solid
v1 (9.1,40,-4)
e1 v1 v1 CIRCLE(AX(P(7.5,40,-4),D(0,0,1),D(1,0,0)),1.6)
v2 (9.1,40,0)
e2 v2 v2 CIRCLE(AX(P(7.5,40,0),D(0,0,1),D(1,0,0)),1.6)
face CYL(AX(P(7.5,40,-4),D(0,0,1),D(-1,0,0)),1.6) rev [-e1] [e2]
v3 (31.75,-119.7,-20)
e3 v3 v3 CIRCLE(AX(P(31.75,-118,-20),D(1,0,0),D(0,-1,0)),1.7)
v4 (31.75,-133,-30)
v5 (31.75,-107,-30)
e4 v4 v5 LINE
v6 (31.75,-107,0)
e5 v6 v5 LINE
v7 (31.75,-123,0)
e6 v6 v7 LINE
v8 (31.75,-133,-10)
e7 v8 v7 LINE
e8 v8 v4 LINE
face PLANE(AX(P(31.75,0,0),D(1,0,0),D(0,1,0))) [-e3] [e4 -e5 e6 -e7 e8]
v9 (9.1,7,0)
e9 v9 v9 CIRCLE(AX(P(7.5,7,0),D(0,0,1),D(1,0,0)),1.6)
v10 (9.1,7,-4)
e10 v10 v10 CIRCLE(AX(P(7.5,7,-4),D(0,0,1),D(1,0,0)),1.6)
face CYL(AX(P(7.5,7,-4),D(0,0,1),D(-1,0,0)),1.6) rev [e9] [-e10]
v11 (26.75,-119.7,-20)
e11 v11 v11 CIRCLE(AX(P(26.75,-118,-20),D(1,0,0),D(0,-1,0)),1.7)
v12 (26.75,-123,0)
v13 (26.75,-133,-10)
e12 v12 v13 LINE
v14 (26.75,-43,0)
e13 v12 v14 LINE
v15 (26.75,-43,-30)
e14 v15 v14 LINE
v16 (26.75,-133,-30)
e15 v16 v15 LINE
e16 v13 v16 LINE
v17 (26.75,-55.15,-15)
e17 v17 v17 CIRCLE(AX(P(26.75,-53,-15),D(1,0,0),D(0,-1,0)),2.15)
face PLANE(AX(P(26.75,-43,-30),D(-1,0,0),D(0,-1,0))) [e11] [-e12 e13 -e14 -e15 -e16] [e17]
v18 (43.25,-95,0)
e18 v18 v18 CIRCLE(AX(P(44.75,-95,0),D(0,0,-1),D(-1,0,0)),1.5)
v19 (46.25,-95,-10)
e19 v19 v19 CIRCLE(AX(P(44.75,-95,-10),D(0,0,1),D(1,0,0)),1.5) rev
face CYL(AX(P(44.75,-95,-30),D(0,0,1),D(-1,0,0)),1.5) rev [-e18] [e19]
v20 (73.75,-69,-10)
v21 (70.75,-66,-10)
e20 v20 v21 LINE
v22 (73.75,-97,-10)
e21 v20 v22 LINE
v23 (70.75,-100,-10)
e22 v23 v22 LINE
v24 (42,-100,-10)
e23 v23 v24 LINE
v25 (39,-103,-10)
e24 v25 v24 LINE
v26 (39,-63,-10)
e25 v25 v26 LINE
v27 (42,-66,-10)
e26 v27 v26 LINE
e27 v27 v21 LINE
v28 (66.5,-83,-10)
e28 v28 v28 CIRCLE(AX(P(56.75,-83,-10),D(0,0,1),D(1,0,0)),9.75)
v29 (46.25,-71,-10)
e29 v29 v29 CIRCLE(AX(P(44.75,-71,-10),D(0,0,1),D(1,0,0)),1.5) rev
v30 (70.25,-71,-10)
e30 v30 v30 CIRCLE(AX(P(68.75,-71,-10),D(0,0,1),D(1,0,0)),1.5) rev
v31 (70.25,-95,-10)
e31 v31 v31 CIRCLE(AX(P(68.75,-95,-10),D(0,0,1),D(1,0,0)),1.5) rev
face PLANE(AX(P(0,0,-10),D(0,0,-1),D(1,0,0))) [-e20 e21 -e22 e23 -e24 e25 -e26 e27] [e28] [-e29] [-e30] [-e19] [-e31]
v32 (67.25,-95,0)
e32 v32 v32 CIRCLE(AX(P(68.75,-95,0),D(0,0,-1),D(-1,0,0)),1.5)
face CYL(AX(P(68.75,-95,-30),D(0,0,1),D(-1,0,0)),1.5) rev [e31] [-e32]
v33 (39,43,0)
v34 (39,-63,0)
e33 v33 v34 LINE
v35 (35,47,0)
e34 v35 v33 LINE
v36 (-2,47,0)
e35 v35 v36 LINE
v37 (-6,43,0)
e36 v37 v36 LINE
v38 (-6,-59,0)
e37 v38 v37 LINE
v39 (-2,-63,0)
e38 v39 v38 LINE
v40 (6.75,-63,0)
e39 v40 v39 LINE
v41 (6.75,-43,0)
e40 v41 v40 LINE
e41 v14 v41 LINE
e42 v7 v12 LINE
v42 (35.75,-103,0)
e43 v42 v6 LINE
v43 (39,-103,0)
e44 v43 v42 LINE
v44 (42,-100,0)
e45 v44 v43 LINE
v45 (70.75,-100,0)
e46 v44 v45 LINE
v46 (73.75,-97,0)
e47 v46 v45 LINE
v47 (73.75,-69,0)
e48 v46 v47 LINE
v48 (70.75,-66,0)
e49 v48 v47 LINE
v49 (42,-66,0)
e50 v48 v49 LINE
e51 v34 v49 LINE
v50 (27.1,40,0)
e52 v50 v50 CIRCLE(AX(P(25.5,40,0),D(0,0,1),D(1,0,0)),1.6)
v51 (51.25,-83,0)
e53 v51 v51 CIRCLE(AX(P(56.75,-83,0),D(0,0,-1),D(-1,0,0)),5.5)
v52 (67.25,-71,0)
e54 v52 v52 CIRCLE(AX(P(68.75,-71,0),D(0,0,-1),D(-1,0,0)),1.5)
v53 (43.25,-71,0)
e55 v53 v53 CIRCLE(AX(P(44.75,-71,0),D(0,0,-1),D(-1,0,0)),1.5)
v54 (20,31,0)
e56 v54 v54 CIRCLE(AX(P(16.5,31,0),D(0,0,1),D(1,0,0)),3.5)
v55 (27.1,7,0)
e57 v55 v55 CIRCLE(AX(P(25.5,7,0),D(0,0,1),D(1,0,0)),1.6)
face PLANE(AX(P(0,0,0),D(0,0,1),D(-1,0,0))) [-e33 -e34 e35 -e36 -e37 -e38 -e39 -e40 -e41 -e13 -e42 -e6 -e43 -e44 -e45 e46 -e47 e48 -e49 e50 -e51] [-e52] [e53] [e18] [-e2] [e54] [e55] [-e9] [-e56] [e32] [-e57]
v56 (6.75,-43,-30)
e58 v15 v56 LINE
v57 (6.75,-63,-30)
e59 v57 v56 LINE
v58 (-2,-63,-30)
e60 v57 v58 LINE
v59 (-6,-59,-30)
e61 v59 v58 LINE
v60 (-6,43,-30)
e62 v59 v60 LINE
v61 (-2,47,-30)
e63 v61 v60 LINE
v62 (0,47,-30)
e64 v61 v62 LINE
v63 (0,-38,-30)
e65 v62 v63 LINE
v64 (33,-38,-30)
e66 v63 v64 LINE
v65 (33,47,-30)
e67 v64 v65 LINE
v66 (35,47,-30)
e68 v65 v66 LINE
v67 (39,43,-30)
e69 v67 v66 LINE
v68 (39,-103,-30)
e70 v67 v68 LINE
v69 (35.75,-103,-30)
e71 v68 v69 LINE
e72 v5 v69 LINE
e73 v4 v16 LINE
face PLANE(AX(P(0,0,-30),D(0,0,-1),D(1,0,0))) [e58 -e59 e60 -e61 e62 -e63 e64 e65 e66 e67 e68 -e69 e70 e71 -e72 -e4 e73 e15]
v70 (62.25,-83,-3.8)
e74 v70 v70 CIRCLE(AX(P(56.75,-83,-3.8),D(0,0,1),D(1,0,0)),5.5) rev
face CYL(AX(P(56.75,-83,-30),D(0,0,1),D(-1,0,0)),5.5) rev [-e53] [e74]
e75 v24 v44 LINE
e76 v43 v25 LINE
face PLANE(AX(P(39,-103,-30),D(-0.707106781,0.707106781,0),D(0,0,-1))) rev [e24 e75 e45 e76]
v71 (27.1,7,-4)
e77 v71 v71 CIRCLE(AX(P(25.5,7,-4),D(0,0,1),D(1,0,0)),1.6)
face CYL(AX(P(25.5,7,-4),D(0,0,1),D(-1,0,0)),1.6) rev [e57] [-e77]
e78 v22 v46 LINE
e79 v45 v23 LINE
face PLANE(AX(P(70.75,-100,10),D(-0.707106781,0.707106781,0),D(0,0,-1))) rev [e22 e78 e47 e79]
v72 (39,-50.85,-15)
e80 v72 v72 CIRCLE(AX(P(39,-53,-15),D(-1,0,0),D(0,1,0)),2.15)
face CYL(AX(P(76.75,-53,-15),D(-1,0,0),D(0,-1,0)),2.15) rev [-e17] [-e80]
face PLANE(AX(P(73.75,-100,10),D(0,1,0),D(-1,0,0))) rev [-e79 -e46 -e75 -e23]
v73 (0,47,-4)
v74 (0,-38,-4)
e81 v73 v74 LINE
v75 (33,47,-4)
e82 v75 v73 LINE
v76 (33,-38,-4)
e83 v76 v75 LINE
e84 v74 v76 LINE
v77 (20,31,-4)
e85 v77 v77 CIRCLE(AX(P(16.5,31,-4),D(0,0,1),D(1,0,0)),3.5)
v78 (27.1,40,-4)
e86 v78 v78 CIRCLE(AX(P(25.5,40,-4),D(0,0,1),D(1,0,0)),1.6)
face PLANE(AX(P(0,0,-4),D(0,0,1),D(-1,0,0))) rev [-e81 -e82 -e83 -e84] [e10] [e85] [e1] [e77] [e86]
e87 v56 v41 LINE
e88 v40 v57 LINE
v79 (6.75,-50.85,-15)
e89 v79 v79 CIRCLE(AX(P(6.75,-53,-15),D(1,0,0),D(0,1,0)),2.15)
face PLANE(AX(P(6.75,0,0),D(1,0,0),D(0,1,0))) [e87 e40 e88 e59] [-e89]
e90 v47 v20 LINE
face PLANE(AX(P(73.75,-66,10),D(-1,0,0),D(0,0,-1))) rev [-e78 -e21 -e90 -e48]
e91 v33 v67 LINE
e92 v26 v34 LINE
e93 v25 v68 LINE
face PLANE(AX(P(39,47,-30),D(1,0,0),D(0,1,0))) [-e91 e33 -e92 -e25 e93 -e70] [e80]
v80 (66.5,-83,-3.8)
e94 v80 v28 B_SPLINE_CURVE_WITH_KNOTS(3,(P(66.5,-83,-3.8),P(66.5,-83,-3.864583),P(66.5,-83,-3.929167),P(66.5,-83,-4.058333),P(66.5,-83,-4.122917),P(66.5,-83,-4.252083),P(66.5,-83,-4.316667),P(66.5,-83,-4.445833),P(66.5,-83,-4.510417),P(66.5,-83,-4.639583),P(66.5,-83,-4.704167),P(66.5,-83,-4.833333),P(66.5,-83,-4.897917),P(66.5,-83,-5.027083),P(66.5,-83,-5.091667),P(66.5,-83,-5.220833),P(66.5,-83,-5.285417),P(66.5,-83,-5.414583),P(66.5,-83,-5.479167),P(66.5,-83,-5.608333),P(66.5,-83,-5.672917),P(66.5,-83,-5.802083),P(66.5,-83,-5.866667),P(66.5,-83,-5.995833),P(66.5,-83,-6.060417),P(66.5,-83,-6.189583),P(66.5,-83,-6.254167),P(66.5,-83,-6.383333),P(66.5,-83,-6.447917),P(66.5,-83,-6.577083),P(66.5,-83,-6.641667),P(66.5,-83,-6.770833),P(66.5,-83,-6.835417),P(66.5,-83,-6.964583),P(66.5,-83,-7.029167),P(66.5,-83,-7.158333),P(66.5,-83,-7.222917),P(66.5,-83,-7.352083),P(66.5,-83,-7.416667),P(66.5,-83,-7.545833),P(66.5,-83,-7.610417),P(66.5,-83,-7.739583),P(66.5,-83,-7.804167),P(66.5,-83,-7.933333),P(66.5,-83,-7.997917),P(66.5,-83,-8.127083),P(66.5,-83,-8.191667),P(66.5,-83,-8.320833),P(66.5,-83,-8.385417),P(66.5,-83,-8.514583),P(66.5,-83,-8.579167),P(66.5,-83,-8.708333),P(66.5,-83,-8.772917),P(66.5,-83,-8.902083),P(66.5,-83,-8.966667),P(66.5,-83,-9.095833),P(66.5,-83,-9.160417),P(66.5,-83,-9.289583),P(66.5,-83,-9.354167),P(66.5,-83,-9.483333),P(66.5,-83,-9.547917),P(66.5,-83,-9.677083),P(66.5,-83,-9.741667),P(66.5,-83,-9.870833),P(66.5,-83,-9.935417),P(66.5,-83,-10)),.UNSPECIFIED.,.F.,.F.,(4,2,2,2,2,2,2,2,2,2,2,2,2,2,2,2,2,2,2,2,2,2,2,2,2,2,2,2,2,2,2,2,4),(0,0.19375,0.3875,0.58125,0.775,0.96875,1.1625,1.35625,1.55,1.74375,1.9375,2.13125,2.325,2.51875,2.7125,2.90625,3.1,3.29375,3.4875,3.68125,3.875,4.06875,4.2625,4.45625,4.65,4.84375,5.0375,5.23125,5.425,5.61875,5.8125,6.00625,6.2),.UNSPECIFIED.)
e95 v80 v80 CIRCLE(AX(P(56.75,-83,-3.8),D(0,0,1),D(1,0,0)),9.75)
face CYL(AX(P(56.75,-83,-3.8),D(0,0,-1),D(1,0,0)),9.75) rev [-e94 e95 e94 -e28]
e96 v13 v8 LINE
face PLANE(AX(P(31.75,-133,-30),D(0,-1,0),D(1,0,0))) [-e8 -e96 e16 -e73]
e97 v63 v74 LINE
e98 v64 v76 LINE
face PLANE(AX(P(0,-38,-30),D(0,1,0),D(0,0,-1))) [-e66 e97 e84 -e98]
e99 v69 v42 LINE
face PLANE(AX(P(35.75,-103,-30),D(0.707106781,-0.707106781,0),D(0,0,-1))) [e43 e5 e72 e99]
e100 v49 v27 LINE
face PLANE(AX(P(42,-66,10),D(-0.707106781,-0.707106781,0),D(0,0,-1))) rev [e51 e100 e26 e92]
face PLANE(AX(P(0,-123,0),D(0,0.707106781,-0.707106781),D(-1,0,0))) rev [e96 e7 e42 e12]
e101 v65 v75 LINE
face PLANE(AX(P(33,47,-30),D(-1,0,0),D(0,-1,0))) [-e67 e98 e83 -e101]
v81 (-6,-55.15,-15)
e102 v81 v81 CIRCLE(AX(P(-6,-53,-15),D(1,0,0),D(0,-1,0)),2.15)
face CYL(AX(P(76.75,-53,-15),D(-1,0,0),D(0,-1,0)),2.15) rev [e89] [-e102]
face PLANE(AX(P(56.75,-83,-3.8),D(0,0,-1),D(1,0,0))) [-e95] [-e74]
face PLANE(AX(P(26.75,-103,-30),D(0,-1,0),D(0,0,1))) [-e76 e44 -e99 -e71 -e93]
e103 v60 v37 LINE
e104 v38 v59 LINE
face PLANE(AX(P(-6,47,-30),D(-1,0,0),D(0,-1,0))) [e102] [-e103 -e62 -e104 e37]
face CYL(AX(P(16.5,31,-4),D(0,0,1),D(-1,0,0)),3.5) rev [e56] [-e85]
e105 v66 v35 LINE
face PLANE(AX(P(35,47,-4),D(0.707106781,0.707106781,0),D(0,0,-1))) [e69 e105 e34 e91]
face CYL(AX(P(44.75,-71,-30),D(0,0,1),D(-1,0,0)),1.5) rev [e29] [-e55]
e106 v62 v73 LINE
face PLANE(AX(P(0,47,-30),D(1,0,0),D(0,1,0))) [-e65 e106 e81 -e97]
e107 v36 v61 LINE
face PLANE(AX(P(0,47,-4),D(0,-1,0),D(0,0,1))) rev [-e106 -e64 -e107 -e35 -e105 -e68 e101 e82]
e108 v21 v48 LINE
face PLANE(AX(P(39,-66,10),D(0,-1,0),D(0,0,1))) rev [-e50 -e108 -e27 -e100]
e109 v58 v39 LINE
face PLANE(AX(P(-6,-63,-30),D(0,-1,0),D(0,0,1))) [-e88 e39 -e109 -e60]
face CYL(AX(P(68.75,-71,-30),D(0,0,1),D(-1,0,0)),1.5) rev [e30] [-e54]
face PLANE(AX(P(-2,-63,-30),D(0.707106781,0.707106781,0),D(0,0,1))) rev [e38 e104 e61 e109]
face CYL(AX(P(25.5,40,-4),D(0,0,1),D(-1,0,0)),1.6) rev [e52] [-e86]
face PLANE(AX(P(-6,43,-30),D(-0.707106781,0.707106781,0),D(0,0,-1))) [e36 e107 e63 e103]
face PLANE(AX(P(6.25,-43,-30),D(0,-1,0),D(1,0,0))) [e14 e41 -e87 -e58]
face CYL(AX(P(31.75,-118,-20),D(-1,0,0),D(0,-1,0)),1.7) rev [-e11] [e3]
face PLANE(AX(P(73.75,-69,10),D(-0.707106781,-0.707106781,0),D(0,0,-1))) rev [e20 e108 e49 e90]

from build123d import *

# Parameters (mm, degrees)
SKETCH_1_W               = 33
SKETCH_1_H               = 47
SKETCH_1_R               = 1.6
SKETCH_1_R_2             = 3.5
EXTRUDE_1_DEPTH          = 4
EXTRUDE_2_DEPTH          = 30
EXTRUDE_START            = -4
SKETCH_4_W               = 33
SKETCH_4_H               = 38
EXTRUDE_3_DEPTH          = 4
SKETCH_6_W               = 50
SKETCH_6_H               = 40
SKETCH_6_R               = 5.5
SKETCH_6_R_2             = 1.5
EXTRUDE_4_DEPTH          = 30
SKETCH_7_W               = 37.75
SKETCH_7_H               = 40
CUT_EXTRUDE_1_DEPTH      = 20
SKETCH_8_R               = 9.75
CUT_EXTRUDE_2_DEPTH      = 6.2
SKETCH_10_R              = 2.15
CUT_EXTRUDE_4_DEPTH      = 136.486392306
SKETCH_11_W              = 30
SKETCH_11_H              = 30
SKETCH_11_R              = 1.7
EXTRUDE_5_DEPTH          = 5
CUT_EXTRUDE_5_DEPTH      = 20
CHAMFER_1_SIZE           = 4
CHAMFER_2_SIZE           = 3
CHAMFER_3_SIZE           = 10
CUT_EXTRUDE_6_DEPTH      = 164.487193688
CUT_EXTRUDE_6_DEPTH_BACK = 30
SKETCH_13_W              = 132.923896649
SKETCH_13_H              = 188.96680941
SKETCH_14_W              = 30
SKETCH_14_H              = 20
SKETCH_14_R              = 2.15
EXTRUDE_6_DEPTH          = 0.5


with BuildPart() as part:
    # 草图1 → 凸台-拉伸1 (new body)
    with BuildSketch(Plane.XY):
        with Locations((16.5, 23.5)):
            Rectangle(SKETCH_1_W, SKETCH_1_H)
        with Locations((7.5, 40)):
            Circle(SKETCH_1_R, mode=Mode.SUBTRACT)
        with Locations((25.5, 40)):
            Circle(SKETCH_1_R, mode=Mode.SUBTRACT)
        with Locations((7.5, 7)):
            Circle(SKETCH_1_R, mode=Mode.SUBTRACT)
        with Locations((25.5, 7)):
            Circle(SKETCH_1_R, mode=Mode.SUBTRACT)
        with Locations((16.5, 31)):
            Circle(SKETCH_1_R_2, mode=Mode.SUBTRACT)
    extrude(amount=EXTRUDE_1_DEPTH)

    # 草图3 → 凸台-拉伸2 (add)
    with BuildSketch(Plane(origin=(0, 0, 0), x_dir=(-1, 0, 0), z_dir=(0, 0, -1))):
        Polygon((0, -38), (-33, -38), (-33, 47), (-39, 47), (-39, -63), (-26.75, -63), (-26.75, -43), (-6.25, -43), (-6.25, -63), (6, -63), (6, 47), (0, 47), align=None)
    extrude(amount=-EXTRUDE_2_DEPTH)

    # 草图4 → 凸台-拉伸3 (add)
    with BuildSketch(Plane(origin=(0, 0, 0), x_dir=(-1, 0, 0), z_dir=(0, 0, -1)).offset(EXTRUDE_START)):
        with Locations((-16.5, -19)):
            Rectangle(SKETCH_4_W, SKETCH_4_H)
    extrude(amount=EXTRUDE_3_DEPTH)

    # 草图6 → 凸台-拉伸4 (add, through all)
    with BuildSketch(Plane(origin=(0, 0, 0), x_dir=(-1, 0, 0), z_dir=(0, 0, -1))):
        with Locations((-51.75, -83)):
            Rectangle(SKETCH_6_W, SKETCH_6_H)
        with Locations((-56.75, -83)):
            Circle(SKETCH_6_R, mode=Mode.SUBTRACT)
        with Locations((-68.75, -95)):
            Circle(SKETCH_6_R_2, mode=Mode.SUBTRACT)
        with Locations((-68.75, -71)):
            Circle(SKETCH_6_R_2, mode=Mode.SUBTRACT)
        with Locations((-44.75, -95)):
            Circle(SKETCH_6_R_2, mode=Mode.SUBTRACT)
        with Locations((-44.75, -71)):
            Circle(SKETCH_6_R_2, mode=Mode.SUBTRACT)
    extrude(amount=-EXTRUDE_4_DEPTH)

    # 草图7 → 切除-拉伸1 (cut)
    with BuildSketch(Plane.XY.offset(30)):
        with Locations((57.875, -83)):
            Rectangle(SKETCH_7_W, SKETCH_7_H)
    extrude(amount=-CUT_EXTRUDE_1_DEPTH, mode=Mode.SUBTRACT)

    # 草图8 → 切除-拉伸2 (cut)
    with BuildSketch(Plane.XY.offset(10)):
        with Locations((56.75, -83)):
            Circle(SKETCH_8_R)
    extrude(amount=-CUT_EXTRUDE_2_DEPTH, mode=Mode.SUBTRACT)

    # 草图10 → 切除-拉伸4 (cut, through all)
    with BuildSketch(Plane.ZY.offset(6)):
        with Locations(Location((15, -53, 0), (0, 0, 270))):
            Circle(SKETCH_10_R)
    extrude(amount=-CUT_EXTRUDE_4_DEPTH, mode=Mode.SUBTRACT)

    # 草图11 → 凸台-拉伸5 (add)
    with BuildSketch(Plane.ZY.offset(-26.75)):
        with Locations((15, -118)):
            Rectangle(SKETCH_11_W, SKETCH_11_H)
        with Locations(Location((20, -118, 0), (0, 0, 270))):
            Circle(SKETCH_11_R, mode=Mode.SUBTRACT)
    extrude(amount=-EXTRUDE_5_DEPTH)

    # 草图12 → 切除-拉伸5 (cut)
    with BuildSketch(Plane.XY.offset(10)):
        Polygon((39, -103), (76.75, -103), (76.75, -63), (39, -63), (39, -66), (73.75, -66), (73.75, -100), (39, -100), align=None)
    extrude(amount=-CUT_EXTRUDE_5_DEPTH, mode=Mode.SUBTRACT)

    # 倒角1
    chamfer_1_edges = [part.edges().sort_by_distance(p)[0] for p in [
        (31.75, -103, 15),
        (-6, 47, 15),
        (-6, -63, 15),
        (39, 47, 15),
    ]]
    chamfer(chamfer_1_edges, length=CHAMFER_1_SIZE)

    # 倒角2
    chamfer_2_edges = [part.edges().sort_by_distance(p)[0] for p in [
        (39, -100, 5),
        (39, -66, 5),
    ]]
    chamfer(chamfer_2_edges, length=CHAMFER_2_SIZE - 0.0001)  # a hair under: the kernel refuses the full size
    chamfer_2_2_edges = [part.edges().sort_by_distance(p)[0] for p in [
        (73.75, -100, 5),
        (73.75, -66, 5),
    ]]
    chamfer(chamfer_2_2_edges, length=CHAMFER_2_SIZE)

    # 倒角3
    chamfer_3_edges = [part.edges().sort_by_distance(p)[0] for p in [
        (29.25, -133, 0),
    ]]
    chamfer(chamfer_3_edges, length=CHAMFER_3_SIZE)


with BuildPart() as body_2:
    # 镜向1: mirrored copy
    add(part.part.mirror(Plane(origin=(0, 0, 0), x_dir=(1, 0, 0), z_dir=(0, 0, -1))))

    # 草图14 → 凸台-拉伸6 (add)
    with BuildSketch(Plane(origin=(6.25, 0, 0), x_dir=(0, 0, -1), z_dir=(1, 0, 0))):
        with Locations((15, -53)):
            Rectangle(SKETCH_14_W, SKETCH_14_H)
        with Locations(Location((15, -53, 0), (0, 0, 270))):
            Circle(SKETCH_14_R, mode=Mode.SUBTRACT)
    extrude(amount=EXTRUDE_6_DEPTH)


with BuildPart() as part_1:
    add(part.part)

    # 草图13 → 切除-拉伸6 (cut, two sides: drawn at the far end of the back side and taken through both)
    with BuildSketch(Plane.XY.offset(30).offset(-CUT_EXTRUDE_6_DEPTH_BACK)):
        with Locations((27.793899124, -40.302373562)):
            Rectangle(SKETCH_13_W, SKETCH_13_H)
    extrude(amount=CUT_EXTRUDE_6_DEPTH + CUT_EXTRUDE_6_DEPTH_BACK, mode=Mode.SUBTRACT)


solid = body_2.part
